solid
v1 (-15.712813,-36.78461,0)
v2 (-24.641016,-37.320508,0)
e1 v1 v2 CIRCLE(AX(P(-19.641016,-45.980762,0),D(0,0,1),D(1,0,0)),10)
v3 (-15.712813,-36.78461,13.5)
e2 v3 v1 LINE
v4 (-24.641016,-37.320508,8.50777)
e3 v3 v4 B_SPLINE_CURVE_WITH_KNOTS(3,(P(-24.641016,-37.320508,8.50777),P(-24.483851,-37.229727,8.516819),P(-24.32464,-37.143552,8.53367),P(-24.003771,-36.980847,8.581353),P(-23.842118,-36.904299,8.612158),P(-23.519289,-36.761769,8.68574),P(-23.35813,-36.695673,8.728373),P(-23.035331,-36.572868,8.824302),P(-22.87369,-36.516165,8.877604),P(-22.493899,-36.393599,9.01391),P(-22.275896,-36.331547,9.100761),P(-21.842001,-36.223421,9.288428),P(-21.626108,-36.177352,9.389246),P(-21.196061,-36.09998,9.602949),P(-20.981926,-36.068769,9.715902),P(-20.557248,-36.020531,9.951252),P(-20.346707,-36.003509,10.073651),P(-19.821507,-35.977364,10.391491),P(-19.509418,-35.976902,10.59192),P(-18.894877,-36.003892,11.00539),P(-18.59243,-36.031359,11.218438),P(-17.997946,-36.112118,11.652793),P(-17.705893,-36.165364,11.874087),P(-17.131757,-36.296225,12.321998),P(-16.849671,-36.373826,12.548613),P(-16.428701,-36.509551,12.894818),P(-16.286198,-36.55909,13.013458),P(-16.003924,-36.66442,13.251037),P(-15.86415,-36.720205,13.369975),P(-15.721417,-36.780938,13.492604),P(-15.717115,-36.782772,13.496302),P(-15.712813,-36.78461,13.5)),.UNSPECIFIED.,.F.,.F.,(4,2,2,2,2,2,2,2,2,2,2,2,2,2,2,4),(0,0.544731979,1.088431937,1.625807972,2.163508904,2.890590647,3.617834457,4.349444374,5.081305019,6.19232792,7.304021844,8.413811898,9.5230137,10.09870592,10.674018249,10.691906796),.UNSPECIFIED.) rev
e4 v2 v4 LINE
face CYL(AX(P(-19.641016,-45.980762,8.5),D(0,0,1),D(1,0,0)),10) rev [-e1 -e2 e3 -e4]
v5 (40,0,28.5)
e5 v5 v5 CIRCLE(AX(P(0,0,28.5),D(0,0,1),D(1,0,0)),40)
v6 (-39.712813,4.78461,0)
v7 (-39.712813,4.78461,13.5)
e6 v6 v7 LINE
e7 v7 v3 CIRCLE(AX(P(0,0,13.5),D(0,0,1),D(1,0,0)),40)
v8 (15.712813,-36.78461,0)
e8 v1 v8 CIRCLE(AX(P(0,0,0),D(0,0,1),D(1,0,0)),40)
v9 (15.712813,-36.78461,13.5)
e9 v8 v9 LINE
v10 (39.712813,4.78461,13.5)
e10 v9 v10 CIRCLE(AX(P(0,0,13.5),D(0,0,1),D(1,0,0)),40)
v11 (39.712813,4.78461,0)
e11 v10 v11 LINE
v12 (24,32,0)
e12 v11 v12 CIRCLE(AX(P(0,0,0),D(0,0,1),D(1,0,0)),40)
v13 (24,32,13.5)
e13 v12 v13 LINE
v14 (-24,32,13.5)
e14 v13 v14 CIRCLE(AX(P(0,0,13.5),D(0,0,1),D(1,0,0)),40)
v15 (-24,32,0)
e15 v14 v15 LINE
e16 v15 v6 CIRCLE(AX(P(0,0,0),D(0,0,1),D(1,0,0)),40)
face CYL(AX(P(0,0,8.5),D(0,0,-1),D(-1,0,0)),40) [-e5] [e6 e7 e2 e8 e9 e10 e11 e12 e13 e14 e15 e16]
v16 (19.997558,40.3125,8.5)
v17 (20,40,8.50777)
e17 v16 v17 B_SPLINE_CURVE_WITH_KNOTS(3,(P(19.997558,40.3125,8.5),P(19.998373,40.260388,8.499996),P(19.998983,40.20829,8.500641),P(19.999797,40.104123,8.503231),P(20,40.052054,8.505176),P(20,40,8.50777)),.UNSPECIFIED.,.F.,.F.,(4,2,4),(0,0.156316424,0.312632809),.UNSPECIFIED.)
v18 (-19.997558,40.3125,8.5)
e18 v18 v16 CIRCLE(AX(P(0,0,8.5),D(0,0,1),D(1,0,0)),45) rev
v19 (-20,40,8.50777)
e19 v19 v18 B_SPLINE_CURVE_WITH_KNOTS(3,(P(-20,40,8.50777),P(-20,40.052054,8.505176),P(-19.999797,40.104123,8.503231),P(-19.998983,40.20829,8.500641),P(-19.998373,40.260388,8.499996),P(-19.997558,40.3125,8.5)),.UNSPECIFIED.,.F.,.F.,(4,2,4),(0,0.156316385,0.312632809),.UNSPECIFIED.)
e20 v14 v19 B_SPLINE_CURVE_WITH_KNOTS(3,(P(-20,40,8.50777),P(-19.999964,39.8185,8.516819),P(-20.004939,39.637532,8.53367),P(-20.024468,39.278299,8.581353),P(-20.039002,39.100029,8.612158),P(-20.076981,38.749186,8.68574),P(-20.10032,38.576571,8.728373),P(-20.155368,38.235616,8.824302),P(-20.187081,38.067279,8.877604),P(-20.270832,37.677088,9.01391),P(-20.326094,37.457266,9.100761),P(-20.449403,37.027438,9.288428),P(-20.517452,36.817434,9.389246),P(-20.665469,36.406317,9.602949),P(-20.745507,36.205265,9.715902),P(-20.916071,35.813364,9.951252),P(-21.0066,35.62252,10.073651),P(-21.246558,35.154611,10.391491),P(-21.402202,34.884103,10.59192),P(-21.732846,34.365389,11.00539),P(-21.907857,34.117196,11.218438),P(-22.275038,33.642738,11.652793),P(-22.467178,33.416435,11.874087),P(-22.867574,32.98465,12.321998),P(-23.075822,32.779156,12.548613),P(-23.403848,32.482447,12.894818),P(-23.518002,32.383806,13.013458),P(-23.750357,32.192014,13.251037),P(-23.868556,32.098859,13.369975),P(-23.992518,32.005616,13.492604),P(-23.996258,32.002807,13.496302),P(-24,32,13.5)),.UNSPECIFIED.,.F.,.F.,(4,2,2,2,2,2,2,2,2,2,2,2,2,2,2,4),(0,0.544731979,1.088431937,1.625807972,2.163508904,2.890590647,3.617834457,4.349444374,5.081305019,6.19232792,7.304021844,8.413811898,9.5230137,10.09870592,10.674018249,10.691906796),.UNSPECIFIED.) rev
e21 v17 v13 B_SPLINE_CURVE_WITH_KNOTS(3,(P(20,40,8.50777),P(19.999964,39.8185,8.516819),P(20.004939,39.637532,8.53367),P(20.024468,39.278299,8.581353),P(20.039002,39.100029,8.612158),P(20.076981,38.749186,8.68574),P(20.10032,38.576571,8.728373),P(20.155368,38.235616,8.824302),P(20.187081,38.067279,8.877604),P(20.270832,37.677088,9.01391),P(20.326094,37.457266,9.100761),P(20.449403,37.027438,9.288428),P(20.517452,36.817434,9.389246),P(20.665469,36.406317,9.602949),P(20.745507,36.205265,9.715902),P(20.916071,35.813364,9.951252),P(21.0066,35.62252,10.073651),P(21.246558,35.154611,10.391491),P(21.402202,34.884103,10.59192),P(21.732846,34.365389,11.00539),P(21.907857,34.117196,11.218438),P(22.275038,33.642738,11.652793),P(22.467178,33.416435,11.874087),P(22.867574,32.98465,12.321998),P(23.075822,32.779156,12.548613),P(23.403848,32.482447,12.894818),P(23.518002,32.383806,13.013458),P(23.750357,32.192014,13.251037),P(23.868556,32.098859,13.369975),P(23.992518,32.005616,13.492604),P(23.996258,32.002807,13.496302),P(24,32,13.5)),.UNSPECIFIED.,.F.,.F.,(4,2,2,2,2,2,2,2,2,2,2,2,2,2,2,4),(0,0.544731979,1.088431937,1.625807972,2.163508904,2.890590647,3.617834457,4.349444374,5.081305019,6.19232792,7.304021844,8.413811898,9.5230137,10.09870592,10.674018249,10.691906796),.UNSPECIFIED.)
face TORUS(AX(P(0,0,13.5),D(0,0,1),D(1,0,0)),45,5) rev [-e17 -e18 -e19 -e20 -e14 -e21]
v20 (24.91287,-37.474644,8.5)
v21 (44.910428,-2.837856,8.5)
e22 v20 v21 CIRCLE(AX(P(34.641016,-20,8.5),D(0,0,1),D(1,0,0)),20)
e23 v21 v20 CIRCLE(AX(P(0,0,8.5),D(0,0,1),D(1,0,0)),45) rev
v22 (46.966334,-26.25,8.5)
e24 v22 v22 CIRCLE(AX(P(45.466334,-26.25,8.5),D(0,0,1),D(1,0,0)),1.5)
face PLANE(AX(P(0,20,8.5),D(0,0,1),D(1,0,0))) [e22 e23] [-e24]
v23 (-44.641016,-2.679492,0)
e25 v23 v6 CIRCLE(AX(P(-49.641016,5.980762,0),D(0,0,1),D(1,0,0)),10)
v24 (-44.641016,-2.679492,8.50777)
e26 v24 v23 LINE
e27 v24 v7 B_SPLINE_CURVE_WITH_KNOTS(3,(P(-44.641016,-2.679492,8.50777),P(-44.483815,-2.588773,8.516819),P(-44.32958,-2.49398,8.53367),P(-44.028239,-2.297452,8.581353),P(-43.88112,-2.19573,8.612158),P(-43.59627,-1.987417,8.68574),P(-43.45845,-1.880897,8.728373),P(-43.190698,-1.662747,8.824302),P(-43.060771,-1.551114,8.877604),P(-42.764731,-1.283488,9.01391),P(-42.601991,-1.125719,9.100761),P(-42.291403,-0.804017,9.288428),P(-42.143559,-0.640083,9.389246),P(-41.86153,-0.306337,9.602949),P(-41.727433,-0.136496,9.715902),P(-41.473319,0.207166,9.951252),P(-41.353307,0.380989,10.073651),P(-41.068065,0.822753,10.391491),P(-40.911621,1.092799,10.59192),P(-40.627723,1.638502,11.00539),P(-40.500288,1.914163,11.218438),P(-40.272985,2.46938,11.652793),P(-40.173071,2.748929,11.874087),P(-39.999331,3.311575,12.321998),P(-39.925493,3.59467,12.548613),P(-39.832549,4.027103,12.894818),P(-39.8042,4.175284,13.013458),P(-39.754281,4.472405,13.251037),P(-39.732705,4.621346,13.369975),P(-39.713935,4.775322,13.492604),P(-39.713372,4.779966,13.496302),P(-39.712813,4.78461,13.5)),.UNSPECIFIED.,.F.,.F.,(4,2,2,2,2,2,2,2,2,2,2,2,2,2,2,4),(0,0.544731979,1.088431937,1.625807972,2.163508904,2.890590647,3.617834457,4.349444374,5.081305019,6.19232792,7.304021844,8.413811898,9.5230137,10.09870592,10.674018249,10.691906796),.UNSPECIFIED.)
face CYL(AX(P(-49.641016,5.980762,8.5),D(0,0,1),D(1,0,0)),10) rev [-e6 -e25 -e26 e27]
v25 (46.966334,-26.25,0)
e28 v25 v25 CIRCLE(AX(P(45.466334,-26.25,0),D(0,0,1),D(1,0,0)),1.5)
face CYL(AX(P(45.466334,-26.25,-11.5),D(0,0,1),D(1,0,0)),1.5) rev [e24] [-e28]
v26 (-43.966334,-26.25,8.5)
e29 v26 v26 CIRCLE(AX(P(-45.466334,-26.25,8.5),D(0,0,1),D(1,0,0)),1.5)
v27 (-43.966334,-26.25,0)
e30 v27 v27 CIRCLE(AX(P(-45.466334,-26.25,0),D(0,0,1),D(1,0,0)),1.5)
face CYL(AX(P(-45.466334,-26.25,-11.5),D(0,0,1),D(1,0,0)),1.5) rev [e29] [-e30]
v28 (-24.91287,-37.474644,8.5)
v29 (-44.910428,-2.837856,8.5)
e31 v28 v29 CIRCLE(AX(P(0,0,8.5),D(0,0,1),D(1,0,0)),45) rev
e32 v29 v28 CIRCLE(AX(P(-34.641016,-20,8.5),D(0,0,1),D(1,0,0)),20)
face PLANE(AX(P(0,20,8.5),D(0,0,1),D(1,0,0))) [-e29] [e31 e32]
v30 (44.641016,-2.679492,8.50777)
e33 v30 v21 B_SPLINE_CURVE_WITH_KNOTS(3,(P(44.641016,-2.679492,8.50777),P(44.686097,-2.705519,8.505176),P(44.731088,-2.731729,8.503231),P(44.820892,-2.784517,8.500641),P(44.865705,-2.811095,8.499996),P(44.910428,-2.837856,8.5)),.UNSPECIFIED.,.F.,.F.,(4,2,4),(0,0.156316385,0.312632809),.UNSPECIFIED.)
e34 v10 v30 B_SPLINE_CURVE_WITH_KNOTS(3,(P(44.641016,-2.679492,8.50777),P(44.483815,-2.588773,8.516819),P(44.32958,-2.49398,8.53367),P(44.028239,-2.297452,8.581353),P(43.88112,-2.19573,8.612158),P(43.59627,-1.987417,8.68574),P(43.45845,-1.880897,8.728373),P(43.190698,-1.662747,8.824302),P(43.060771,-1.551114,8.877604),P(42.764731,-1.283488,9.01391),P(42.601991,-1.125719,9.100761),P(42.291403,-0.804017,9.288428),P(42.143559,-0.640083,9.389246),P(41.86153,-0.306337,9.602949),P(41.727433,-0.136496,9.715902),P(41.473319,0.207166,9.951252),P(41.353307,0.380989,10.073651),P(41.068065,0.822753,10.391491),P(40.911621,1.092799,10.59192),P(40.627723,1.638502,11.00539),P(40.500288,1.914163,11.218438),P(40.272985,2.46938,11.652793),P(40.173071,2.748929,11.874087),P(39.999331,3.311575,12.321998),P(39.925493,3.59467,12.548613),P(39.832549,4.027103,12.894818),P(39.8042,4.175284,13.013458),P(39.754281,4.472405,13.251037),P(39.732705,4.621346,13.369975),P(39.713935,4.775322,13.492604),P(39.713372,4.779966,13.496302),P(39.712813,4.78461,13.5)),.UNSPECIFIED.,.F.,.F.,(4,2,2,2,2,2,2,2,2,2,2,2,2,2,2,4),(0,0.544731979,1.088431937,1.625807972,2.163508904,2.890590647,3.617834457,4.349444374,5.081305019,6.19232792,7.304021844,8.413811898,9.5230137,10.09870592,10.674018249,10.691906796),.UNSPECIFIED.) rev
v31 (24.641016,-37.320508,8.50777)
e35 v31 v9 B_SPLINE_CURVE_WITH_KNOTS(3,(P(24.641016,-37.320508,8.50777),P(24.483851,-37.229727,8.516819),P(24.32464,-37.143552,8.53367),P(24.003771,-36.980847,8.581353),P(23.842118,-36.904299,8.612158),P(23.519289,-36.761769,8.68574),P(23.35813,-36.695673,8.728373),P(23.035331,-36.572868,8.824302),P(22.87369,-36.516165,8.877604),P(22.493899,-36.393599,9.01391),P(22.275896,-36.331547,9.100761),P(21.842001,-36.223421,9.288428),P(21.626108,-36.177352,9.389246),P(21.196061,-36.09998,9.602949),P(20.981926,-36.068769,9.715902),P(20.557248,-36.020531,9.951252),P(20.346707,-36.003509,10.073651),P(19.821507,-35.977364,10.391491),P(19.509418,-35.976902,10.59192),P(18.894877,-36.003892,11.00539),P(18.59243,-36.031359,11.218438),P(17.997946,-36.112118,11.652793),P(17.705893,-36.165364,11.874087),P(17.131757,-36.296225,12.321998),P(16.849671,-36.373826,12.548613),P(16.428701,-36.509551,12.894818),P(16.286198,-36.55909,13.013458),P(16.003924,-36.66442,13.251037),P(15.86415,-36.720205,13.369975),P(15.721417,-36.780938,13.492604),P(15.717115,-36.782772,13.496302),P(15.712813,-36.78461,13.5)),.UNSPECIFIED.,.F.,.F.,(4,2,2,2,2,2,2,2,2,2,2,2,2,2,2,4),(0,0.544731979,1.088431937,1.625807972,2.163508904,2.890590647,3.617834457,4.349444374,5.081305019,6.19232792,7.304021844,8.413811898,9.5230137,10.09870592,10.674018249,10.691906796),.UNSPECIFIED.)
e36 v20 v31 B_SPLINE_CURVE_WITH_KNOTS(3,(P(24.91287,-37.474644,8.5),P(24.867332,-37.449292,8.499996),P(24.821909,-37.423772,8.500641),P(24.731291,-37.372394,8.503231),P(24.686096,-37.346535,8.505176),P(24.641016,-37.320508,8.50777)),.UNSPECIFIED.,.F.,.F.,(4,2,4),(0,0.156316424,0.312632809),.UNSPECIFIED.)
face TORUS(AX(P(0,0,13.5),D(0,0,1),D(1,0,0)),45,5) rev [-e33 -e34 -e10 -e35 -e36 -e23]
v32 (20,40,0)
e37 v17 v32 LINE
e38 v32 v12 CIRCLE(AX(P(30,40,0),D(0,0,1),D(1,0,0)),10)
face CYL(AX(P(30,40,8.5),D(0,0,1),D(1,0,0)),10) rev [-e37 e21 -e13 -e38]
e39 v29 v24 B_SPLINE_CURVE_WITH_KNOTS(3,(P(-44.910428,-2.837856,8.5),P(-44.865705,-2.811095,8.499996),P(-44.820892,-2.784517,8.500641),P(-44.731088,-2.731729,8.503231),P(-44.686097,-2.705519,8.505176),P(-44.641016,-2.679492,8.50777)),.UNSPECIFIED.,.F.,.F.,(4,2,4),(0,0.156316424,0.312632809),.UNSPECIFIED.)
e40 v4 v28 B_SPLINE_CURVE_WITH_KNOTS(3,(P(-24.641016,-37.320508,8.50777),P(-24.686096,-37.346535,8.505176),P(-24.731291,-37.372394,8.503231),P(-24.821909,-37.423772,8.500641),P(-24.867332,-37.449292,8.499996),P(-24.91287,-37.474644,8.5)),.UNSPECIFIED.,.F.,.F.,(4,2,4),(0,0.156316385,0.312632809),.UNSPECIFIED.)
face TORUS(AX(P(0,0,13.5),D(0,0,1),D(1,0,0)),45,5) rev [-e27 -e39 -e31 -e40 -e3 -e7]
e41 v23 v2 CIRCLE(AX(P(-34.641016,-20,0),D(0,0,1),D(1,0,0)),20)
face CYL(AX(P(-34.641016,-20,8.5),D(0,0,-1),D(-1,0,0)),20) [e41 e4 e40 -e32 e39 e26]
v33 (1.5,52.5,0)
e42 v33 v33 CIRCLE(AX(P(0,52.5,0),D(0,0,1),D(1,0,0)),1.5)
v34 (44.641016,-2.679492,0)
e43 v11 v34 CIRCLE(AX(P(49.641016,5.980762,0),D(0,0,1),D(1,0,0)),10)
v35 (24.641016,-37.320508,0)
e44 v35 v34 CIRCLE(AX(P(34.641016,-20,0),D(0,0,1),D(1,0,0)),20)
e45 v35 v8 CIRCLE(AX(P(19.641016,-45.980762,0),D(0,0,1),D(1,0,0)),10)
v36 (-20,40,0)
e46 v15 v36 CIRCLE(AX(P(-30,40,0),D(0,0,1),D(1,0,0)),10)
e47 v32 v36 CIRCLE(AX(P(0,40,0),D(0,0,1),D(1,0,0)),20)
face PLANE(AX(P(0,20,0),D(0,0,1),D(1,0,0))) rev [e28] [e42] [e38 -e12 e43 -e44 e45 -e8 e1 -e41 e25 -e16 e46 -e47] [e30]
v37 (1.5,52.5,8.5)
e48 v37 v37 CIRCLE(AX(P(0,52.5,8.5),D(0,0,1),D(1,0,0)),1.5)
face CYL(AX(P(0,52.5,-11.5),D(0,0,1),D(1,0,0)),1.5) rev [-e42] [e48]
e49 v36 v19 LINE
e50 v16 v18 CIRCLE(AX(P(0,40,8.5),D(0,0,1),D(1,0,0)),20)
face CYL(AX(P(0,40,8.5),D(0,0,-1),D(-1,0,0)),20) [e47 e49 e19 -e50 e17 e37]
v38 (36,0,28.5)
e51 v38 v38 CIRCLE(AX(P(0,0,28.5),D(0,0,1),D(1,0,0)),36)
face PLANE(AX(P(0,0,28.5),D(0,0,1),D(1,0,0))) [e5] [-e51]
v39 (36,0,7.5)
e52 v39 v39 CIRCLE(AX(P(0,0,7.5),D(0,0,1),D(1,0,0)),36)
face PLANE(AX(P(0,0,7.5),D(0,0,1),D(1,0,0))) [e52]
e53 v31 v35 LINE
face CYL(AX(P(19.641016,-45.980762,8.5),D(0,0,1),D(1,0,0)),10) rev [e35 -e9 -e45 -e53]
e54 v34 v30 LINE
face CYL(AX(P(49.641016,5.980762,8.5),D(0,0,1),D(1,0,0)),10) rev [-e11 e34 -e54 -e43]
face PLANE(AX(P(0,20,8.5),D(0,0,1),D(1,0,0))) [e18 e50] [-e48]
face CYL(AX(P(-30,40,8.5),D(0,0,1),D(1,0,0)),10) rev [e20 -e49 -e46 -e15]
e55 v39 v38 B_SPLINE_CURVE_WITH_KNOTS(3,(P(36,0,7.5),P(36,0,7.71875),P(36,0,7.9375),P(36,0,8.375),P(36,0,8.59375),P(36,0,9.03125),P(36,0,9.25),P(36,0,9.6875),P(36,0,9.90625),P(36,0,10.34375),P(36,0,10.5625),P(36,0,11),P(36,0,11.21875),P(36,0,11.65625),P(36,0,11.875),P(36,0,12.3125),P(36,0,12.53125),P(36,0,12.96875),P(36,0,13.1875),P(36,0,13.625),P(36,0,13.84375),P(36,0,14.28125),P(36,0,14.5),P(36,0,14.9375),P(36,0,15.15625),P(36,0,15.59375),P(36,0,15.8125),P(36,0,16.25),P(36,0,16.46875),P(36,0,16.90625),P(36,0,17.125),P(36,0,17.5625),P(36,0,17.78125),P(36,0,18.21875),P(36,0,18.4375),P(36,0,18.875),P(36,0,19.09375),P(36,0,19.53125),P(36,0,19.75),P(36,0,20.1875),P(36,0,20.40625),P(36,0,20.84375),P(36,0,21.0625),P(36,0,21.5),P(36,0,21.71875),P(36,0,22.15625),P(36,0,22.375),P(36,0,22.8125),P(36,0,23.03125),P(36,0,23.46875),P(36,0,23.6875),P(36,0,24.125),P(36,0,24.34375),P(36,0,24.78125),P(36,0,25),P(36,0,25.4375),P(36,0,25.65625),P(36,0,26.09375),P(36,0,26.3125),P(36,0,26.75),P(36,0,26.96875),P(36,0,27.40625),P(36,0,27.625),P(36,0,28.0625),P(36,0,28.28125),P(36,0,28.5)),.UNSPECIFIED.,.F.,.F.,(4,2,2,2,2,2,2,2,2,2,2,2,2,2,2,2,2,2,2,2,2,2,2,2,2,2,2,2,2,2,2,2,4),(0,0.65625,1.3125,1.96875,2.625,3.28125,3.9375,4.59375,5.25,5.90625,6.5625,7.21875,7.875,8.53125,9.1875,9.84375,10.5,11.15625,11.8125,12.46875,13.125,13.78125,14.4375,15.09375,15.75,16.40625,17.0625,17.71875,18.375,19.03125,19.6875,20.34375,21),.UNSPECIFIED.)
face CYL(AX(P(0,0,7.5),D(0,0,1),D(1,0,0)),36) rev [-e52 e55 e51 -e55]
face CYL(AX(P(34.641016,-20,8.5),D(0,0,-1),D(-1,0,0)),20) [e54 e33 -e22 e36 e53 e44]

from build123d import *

# Parameters (mm, degrees)
ESTRUSIONE_ESTRUSIONE1_DEPTH = 8.5
RACCORDO1_R                  = 10
SCHIZZO2_R                   = 40
ESTRUSIONE_ESTRUSIONE2_DEPTH = 20
RACCORDO2_START              = 8.5
RACCORDO2_DEPTH              = 5.0000001
SCHIZZO3_R                   = 1.5
TAGLIO_ESTRUSIONE1_DEPTH     = 20
SCHIZZO4_R                   = 36
TAGLIO_ESTRUSIONE2_DEPTH     = 21


with BuildPart() as part:
    # Schizzo1 → Estrusione-Estrusione1 (new body)
    with BuildSketch(Plane.XY):
        with BuildLine():
            ThreePointArc((-20.628430767, -34.270509831), (0, -40), (20.628430767, -34.270509831))
            ThreePointArc((20.628430767, -34.270509831), (51.961524227, -30), (39.993347498, -0.729490169))
            ThreePointArc((39.993347498, -0.729490169), (34.641016151, 20), (19.364916731, 35))
            ThreePointArc((19.364916731, 35), (0, 60), (-19.364916731, 35))
            ThreePointArc((-19.364916731, 35), (-34.641016151, 20), (-39.993347498, -0.729490169))
            ThreePointArc((-39.993347498, -0.729490169), (-51.961524227, -30), (-20.628430767, -34.270509831))
        make_face()
    extrude(amount=ESTRUSIONE_ESTRUSIONE1_DEPTH)

    # Raccordo1
    raccordo1_edges = [part.edges().sort_by_distance(p)[0] for p in [
        (39.993347498, -0.729490169, 4.25),
        (20.628430767, -34.270509831, 4.25),
        (-20.628430767, -34.270509831, 4.25),
        (-39.993347498, -0.729490169, 4.25),
        (-19.364916731, 35, 4.25),
        (19.364916731, 35, 4.25),
    ]]
    fillet(raccordo1_edges, radius=RACCORDO1_R)

    # Schizzo2 → Estrusione-Estrusione2 (add)
    with BuildSketch(Plane.XY.offset(8.5)):
        with Locations(Location((0, 0, 0), (0, 0, 173.130102354))):
            Circle(SCHIZZO2_R)
    extrude(amount=ESTRUSIONE_ESTRUSIONE2_DEPTH)

    # Raccordo2: read off the stored shape, not the designer's step
    # Raccordo2 outline → Raccordo2 (add)
    with BuildSketch(Plane.XY.offset(RACCORDO2_START)):
        with BuildLine():
            ThreePointArc((-20, 40), (-21.05572809, 35.527864045), (-24, 32))
            ThreePointArc((-24, 32), (0, 40), (24, 32))
            ThreePointArc((24, 32), (21.05572809, 35.527864045), (20, 40))
            ThreePointArc((20, 40), (0, 60), (-20, 40))
        make_face()
        with BuildLine():
            ThreePointArc((-15.712812921, -36.784609691), (-34.641016151, -20), (-39.712812921, 4.784609691))
            ThreePointArc((-39.712812921, 4.784609691), (-41.29589685, 0.470863399), (-44.641016151, -2.679491924))
            ThreePointArc((-44.641016151, -2.679491924), (-51.961524227, -30), (-24.641016151, -37.320508076))
            ThreePointArc((-24.641016151, -37.320508076), (-20.24016876, -35.998727444), (-15.712812921, -36.784609691))
        make_face()
        with BuildLine():
            ThreePointArc((44.641016151, -2.679491924), (41.29589685, 0.470863399), (39.712812921, 4.784609691))
            ThreePointArc((39.712812921, 4.784609691), (34.641016151, -20), (15.712812921, -36.784609691))
            ThreePointArc((15.712812921, -36.784609691), (20.24016876, -35.998727444), (24.641016151, -37.320508076))
            ThreePointArc((24.641016151, -37.320508076), (51.961524227, -30), (44.641016151, -2.679491924))
        make_face()
    extrude(amount=RACCORDO2_DEPTH)

    # Raccordo2 2 outline → Raccordo2 2 (revolve, cut)
    with BuildSketch(Plane.XZ):
        with BuildLine():
            ThreePointArc((40, 13.5), (41.464466094, 9.964466094), (45, 8.5))
            Line((45, 8.5), (60, 8.5))
            Line((60, 8.5), (60, 13.5000001))
            Line((60, 13.5000001), (40, 13.5))
        make_face()
    revolve(axis=Axis((0, 0, 0), (0, 0, 1)), mode=Mode.SUBTRACT)

    # Schizzo3 → Taglio-Estrusione1 (cut)
    with BuildSketch(Plane.XY.offset(8.5)):
        with Locations((0, 52.5)):
            Circle(SCHIZZO3_R)
        with Locations((-45.466333699, -26.25)):
            Circle(SCHIZZO3_R)
        with Locations((45.466333699, -26.25)):
            Circle(SCHIZZO3_R)
    extrude(amount=-TAGLIO_ESTRUSIONE1_DEPTH, mode=Mode.SUBTRACT)

    # Schizzo4 → Taglio-Estrusione2 (cut)
    with BuildSketch(Plane.XY.offset(28.5)):
        Circle(SCHIZZO4_R)
    extrude(amount=-TAGLIO_ESTRUSIONE2_DEPTH, mode=Mode.SUBTRACT)


solid = part.part
